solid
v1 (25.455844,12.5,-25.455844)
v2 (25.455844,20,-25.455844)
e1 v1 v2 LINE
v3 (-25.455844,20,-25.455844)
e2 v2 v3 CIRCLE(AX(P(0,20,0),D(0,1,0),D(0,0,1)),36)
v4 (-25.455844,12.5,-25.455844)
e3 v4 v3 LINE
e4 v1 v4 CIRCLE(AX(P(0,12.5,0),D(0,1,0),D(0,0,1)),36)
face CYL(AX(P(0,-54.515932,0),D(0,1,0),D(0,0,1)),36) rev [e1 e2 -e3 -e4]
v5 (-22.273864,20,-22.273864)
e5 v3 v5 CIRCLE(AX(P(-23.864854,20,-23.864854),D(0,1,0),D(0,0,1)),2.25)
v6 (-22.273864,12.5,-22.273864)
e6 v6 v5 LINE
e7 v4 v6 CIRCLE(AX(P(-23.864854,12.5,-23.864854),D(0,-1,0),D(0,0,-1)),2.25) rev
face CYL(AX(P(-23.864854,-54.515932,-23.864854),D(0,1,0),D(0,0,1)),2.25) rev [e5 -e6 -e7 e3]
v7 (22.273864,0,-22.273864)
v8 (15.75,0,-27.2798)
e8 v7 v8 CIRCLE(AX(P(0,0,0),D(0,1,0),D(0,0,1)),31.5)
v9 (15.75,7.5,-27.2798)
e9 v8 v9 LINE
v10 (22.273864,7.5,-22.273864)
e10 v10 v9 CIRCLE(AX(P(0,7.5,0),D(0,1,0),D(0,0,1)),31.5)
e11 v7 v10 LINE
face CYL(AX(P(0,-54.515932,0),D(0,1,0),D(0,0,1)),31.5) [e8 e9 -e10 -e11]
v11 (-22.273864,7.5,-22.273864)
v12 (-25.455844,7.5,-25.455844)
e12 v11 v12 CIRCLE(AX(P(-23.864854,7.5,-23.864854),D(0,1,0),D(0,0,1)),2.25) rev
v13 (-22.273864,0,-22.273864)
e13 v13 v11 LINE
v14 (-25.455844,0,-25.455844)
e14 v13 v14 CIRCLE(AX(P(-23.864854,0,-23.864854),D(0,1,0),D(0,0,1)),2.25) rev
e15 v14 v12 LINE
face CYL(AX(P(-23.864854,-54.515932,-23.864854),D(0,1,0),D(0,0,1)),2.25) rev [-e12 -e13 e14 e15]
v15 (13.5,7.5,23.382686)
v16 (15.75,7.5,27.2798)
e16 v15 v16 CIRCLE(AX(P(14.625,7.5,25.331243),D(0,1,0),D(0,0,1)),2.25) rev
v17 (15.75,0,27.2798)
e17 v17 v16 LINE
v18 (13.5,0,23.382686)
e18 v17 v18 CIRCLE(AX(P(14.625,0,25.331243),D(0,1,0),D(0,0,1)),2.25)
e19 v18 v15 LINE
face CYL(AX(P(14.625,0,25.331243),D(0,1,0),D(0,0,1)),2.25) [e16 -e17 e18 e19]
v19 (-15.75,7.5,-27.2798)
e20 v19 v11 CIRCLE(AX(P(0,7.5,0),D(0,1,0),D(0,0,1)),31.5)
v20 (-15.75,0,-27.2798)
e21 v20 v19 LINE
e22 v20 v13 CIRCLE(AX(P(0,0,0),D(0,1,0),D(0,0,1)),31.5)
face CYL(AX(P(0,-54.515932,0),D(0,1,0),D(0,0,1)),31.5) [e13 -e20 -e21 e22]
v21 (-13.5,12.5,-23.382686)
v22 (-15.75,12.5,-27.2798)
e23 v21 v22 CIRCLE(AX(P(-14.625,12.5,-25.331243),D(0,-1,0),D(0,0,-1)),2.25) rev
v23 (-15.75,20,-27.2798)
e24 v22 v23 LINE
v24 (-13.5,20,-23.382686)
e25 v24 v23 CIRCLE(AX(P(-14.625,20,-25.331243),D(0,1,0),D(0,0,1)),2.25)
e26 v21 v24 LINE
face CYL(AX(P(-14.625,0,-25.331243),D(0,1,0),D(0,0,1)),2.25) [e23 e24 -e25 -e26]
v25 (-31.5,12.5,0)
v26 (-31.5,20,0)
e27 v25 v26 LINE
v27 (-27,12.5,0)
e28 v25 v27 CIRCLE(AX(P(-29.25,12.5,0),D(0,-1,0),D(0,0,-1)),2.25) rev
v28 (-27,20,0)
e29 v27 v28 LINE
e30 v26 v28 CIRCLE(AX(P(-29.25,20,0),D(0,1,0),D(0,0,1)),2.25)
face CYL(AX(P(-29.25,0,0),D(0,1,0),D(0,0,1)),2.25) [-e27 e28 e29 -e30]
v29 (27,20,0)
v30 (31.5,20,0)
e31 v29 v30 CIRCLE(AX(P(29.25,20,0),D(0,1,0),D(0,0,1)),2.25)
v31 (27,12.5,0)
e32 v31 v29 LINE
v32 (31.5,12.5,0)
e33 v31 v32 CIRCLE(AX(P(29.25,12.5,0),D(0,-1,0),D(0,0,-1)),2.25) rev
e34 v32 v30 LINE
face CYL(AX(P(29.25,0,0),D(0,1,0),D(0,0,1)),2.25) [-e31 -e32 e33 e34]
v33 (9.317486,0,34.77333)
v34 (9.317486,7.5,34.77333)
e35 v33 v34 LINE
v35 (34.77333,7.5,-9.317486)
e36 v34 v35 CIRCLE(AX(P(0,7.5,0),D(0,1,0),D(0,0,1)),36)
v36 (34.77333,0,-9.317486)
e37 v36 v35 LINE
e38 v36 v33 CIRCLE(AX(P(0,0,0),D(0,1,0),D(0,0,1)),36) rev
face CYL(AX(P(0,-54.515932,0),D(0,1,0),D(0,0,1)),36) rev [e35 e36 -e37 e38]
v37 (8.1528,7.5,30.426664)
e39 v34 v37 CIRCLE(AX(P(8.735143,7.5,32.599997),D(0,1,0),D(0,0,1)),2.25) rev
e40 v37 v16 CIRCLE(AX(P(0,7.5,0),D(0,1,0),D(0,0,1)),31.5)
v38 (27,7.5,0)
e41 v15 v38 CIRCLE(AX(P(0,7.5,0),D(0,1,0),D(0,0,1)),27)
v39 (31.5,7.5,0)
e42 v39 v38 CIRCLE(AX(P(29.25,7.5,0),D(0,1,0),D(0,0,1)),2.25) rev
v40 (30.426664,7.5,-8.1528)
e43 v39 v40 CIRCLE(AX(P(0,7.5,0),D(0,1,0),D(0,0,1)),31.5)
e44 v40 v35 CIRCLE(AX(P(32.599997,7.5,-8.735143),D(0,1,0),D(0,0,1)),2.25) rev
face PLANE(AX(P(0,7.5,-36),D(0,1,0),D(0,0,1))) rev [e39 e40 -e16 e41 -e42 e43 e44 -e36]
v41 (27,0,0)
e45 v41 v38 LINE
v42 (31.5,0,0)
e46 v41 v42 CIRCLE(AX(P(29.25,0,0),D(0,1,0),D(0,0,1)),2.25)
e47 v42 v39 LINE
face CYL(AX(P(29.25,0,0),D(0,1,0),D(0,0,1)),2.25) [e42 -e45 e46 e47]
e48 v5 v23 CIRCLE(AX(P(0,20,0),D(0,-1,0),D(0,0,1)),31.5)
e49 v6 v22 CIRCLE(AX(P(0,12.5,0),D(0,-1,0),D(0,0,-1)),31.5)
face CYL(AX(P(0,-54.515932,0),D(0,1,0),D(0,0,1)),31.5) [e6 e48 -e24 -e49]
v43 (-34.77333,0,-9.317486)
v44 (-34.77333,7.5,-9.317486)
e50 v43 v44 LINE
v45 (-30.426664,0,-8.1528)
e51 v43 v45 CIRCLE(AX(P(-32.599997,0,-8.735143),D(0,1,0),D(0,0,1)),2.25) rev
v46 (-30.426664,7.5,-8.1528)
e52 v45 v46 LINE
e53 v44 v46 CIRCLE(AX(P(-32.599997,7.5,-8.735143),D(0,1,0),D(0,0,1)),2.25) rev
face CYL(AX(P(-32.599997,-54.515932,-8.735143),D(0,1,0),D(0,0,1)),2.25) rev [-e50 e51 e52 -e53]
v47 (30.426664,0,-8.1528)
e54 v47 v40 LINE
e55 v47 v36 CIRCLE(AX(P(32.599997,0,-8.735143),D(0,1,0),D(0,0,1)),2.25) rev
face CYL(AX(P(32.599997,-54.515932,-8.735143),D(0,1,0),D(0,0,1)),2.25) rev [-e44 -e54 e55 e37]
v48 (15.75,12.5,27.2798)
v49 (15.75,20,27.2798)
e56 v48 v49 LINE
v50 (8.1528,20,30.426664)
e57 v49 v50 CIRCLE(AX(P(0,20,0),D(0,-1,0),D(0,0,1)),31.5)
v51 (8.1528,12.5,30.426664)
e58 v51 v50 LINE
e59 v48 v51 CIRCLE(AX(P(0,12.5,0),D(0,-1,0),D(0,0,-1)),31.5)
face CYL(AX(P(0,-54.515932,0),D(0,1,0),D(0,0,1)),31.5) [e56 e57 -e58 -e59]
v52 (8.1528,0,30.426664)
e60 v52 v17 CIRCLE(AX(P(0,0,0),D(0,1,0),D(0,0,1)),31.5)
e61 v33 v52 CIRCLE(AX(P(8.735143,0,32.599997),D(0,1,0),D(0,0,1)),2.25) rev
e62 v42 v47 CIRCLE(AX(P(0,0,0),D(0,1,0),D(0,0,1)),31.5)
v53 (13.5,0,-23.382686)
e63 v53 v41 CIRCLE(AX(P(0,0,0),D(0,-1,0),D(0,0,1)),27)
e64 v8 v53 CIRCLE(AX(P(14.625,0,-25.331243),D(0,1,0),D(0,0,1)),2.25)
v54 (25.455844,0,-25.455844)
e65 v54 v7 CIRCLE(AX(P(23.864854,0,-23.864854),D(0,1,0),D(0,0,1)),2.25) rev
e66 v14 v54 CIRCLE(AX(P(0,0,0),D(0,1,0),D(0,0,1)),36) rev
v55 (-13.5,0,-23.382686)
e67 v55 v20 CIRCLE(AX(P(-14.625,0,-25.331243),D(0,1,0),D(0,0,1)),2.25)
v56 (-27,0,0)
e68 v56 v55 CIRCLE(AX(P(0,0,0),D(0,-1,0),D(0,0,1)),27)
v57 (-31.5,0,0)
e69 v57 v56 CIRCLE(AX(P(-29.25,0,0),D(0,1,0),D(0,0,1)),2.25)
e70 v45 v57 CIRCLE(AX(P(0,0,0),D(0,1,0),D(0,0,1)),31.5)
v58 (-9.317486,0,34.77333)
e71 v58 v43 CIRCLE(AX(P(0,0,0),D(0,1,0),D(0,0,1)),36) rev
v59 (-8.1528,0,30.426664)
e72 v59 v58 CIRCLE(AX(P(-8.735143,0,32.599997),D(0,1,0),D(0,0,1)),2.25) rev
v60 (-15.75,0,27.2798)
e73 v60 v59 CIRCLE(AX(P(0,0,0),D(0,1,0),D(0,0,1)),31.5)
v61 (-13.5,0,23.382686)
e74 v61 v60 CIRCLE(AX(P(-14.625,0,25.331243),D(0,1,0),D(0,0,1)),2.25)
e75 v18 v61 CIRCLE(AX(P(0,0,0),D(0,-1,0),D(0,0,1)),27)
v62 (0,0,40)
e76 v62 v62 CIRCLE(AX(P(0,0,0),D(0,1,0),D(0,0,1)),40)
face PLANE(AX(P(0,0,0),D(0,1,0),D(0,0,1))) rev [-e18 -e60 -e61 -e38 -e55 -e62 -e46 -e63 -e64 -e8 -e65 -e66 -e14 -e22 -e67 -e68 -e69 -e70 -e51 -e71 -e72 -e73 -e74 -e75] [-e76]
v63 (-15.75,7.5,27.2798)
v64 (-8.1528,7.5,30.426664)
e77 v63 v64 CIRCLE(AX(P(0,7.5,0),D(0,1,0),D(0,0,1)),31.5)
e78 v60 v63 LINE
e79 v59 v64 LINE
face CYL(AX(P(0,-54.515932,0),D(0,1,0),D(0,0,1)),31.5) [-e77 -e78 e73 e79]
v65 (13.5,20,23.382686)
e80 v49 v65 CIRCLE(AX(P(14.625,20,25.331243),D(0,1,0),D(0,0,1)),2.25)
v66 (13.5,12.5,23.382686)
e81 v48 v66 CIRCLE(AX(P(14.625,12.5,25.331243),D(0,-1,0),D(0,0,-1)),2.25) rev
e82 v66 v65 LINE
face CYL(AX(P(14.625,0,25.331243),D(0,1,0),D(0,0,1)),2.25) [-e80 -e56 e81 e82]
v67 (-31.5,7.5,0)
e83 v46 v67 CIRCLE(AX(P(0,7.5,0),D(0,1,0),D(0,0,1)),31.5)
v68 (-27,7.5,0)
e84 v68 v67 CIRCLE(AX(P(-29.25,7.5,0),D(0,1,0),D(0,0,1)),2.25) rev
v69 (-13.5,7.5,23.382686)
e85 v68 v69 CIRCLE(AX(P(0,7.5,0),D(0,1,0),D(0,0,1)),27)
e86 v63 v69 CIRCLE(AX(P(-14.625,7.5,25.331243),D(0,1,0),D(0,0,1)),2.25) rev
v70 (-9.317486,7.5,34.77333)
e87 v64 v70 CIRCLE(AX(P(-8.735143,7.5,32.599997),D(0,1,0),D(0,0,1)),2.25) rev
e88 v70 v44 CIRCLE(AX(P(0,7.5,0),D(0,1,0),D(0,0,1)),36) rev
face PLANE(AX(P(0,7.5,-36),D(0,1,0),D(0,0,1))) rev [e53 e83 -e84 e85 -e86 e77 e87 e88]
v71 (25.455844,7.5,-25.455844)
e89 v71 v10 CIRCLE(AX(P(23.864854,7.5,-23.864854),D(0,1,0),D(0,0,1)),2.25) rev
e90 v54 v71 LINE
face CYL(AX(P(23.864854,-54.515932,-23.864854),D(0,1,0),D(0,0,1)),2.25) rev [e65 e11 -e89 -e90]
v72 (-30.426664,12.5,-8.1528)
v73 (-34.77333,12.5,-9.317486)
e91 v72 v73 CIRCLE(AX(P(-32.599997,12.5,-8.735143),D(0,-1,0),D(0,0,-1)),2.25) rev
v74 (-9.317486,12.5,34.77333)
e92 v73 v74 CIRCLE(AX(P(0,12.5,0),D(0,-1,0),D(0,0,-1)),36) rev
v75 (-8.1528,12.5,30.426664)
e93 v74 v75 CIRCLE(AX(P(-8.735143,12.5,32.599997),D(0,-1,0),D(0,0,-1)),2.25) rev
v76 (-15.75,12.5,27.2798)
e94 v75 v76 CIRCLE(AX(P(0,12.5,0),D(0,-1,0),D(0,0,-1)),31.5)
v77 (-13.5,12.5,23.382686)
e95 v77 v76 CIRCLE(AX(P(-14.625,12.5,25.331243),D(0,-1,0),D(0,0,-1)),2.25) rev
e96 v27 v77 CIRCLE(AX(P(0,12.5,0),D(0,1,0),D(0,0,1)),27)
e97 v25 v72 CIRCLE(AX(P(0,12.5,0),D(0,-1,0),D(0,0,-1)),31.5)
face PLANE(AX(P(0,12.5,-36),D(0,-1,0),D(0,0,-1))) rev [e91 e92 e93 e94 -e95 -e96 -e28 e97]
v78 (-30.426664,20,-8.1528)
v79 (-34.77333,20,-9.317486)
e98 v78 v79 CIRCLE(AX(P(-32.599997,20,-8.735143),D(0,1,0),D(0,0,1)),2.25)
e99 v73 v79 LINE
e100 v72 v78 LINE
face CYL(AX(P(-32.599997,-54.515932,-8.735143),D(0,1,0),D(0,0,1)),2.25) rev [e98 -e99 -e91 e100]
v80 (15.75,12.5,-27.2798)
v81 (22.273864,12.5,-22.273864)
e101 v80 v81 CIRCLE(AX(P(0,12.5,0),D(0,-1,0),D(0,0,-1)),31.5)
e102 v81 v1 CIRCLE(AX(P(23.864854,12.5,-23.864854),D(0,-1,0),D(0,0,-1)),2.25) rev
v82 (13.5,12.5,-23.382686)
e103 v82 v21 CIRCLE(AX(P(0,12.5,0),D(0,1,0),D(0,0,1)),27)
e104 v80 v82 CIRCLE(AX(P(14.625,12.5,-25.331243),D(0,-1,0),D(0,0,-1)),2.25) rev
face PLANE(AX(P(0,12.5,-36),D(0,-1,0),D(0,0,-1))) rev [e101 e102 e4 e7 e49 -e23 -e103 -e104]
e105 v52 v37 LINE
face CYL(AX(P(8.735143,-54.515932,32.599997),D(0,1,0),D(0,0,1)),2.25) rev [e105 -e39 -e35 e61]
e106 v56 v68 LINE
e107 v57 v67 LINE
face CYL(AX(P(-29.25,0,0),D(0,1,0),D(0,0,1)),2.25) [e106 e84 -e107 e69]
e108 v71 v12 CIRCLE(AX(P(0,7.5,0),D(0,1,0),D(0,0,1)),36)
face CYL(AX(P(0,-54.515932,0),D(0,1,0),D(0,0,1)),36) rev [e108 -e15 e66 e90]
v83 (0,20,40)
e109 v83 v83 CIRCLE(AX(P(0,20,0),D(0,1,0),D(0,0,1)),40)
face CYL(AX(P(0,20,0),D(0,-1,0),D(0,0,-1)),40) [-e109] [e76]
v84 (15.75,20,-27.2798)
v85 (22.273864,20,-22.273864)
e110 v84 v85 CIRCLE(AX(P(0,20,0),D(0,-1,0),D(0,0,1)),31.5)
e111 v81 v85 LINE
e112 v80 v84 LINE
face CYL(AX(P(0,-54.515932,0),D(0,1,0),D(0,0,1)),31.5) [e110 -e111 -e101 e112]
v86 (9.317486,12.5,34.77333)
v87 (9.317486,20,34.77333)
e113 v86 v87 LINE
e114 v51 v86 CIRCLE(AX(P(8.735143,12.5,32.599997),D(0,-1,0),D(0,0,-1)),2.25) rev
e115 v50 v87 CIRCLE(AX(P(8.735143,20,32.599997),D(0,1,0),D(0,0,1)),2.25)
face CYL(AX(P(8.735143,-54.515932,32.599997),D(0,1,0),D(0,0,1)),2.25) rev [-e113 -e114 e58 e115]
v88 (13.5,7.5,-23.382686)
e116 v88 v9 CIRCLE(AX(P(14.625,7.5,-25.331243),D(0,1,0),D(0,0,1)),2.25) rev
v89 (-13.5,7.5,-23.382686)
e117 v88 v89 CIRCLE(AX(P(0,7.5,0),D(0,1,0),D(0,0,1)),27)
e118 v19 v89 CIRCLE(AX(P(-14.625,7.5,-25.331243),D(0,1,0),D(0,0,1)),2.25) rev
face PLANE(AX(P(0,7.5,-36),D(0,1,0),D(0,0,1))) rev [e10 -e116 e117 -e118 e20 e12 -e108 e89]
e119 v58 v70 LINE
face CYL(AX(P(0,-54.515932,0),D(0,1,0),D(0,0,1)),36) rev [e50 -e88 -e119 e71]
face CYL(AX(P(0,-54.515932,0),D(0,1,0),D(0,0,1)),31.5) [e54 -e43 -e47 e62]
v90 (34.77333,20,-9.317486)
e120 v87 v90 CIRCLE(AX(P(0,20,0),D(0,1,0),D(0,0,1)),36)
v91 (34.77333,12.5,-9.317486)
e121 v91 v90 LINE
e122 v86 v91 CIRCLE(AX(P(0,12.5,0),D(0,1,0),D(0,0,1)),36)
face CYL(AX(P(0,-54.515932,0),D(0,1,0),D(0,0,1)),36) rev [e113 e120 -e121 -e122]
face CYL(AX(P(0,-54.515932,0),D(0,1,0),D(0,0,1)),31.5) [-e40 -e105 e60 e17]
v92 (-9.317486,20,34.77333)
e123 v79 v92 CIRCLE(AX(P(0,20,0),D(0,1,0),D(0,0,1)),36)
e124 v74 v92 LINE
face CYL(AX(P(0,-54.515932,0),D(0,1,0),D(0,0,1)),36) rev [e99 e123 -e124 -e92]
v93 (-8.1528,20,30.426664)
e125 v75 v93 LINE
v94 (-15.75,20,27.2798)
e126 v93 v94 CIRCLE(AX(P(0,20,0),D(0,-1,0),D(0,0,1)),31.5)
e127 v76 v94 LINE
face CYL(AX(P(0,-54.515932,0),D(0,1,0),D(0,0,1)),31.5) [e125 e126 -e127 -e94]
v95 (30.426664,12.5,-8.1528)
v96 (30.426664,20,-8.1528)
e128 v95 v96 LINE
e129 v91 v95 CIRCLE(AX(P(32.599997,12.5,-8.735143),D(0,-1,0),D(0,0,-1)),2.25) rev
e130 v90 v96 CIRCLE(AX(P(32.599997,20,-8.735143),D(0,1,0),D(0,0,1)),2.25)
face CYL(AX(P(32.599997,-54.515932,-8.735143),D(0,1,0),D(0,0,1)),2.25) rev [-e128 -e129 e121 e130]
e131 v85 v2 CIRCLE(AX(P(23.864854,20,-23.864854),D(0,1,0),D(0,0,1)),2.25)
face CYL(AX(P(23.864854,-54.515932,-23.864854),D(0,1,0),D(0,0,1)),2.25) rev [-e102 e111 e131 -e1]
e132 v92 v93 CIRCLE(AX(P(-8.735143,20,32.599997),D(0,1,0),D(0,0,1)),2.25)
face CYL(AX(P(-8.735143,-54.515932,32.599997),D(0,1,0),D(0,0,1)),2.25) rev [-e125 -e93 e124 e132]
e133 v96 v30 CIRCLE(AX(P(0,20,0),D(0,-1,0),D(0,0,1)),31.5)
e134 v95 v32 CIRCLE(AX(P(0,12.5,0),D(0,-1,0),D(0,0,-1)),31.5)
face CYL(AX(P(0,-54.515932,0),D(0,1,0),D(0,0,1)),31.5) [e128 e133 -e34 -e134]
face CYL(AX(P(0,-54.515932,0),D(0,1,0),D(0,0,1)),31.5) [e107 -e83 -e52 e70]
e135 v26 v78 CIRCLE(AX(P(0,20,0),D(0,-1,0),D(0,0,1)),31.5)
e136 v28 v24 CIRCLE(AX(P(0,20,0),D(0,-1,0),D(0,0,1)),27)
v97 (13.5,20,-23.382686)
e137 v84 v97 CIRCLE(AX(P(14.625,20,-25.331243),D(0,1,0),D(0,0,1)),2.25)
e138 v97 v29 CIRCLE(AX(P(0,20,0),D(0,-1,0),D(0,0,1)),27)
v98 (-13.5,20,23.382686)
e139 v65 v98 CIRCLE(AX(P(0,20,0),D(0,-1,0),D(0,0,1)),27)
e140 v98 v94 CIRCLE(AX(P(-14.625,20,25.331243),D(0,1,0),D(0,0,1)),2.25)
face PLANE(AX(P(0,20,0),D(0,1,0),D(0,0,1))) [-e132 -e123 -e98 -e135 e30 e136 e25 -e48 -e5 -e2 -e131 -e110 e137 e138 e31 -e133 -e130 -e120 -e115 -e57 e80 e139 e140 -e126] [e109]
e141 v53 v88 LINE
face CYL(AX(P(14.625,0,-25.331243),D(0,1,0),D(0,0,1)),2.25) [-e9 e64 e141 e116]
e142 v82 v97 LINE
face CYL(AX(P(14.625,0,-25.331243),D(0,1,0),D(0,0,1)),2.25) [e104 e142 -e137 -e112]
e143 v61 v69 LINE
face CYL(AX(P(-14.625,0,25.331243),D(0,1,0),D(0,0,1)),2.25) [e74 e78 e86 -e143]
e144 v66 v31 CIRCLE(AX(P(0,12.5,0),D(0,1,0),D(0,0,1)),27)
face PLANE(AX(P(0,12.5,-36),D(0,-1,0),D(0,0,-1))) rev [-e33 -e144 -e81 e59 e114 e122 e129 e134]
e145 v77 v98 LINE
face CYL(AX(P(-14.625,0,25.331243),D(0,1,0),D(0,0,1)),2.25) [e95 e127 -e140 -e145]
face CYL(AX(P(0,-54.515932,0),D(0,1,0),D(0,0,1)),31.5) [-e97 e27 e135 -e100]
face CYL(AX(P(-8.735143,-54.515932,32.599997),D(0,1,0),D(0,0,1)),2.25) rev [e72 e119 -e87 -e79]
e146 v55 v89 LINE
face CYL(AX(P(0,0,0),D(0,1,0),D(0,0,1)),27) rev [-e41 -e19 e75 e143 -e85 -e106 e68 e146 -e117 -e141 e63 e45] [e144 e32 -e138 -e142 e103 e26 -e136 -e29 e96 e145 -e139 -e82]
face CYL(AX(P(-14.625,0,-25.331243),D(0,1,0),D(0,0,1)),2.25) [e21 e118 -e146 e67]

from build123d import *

# Parameters (mm, degrees)
ESQUISSE1_R              = 40
ESQUISSE1_R_2            = 25
BOSS_EXTRU_1_DEPTH       = 20
EMPREINTE1_OUTLINE_R     = 25
EMPREINTE1_DEPTH         = 7.5
EMPREINTE1_START         = 12.5
EMPREINTE1_2_OUTLINE_R   = 25
EMPREINTE1_2_DEPTH       = 7.5
EMPREINTE1_START_2       = 7.5
EMPREINTE1_3_OUTLINE_R   = 27
EMPREINTE1_3_OUTLINE_R_2 = 25
EMPREINTE1_3_DEPTH       = 5


# Read off the part's stored shape, not the designer's step: Empreinte1
with BuildPart() as part:
    # Esquisse1 → Boss.-Extru.1 (new body)
    with BuildSketch(Plane(origin=(0, 0, 0), x_dir=(1, 0, 0), z_dir=(0, 1, 0))):
        with Locations(Location((0, 0, 0), (0, 0, 270))):
            Circle(ESQUISSE1_R)
        with Locations(Location((0, 0, 0), (0, 0, 270))):
            Circle(ESQUISSE1_R_2, mode=Mode.SUBTRACT)
    extrude(amount=BOSS_EXTRU_1_DEPTH)

    # Empreinte1 outline → Empreinte1 (cut)
    with BuildSketch(Plane(origin=(0, 0, 0), x_dir=(1, 0, 0), z_dir=(0, 1, 0))):
        with BuildLine():
            ThreePointArc((-15.75, 27.279800219), (-12.676442841, 26.456243061), (-13.5, 23.382685902))
            ThreePointArc((-13.5, 23.382685902), (-23.382685902, 13.5), (-27, 0))
            ThreePointArc((-27, 0), (-29.25, -2.25), (-31.5, 0))
            ThreePointArc((-31.5, 0), (-31.230513133, 4.111575055), (-30.426663528, 8.152799921))
            ThreePointArc((-30.426663528, 8.152799921), (-32.017653786, 10.908475881), (-34.773329746, 9.317485624))
            ThreePointArc((-34.773329746, 9.317485624), (-31.176914536, -18), (-9.317485624, -34.773329746))
            ThreePointArc((-9.317485624, -34.773329746), (-6.561809663, -33.182339489), (-8.152799921, -30.426663528))
            ThreePointArc((-8.152799921, -30.426663528), (-12.05452812, -29.102205274), (-15.75, -27.279800219))
            ThreePointArc((-15.75, -27.279800219), (-16.573557159, -24.20624306), (-13.5, -23.382685902))
            ThreePointArc((-13.5, -23.382685902), (0, -27), (13.5, -23.382685902))
            ThreePointArc((13.5, -23.382685902), (16.573557159, -24.20624306), (15.75, -27.279800219))
            ThreePointArc((15.75, -27.279800219), (12.05452812, -29.102205274), (8.152799921, -30.426663528))
            ThreePointArc((8.152799921, -30.426663528), (6.561809663, -33.182339489), (9.317485624, -34.773329746))
            ThreePointArc((9.317485624, -34.773329746), (31.176914536, -18), (34.773329746, 9.317485624))
            ThreePointArc((34.773329746, 9.317485624), (32.017653786, 10.908475881), (30.426663528, 8.152799921))
            ThreePointArc((30.426663528, 8.152799921), (31.230513133, 4.111575055), (31.5, 0))
            ThreePointArc((31.5, 0), (29.25, -2.25), (27, 0))
            ThreePointArc((27, 0), (23.382685902, 13.5), (13.5, 23.382685902))
            ThreePointArc((13.5, 23.382685902), (12.676442841, 26.456243061), (15.75, 27.279800219))
            ThreePointArc((15.75, 27.279800219), (19.175985014, 24.990630219), (22.273863607, 22.273863607))
            ThreePointArc((22.273863607, 22.273863607), (25.455844123, 22.273863607), (25.455844123, 25.455844123))
            ThreePointArc((25.455844123, 25.455844123), (0, 36), (-25.455844123, 25.455844123))
            ThreePointArc((-25.455844123, 25.455844123), (-25.455844123, 22.273863607), (-22.273863607, 22.273863607))
            ThreePointArc((-22.273863607, 22.273863607), (-19.175985014, 24.990630219), (-15.75, 27.279800219))
        make_face()
        Circle(EMPREINTE1_OUTLINE_R, mode=Mode.SUBTRACT)
    extrude(amount=EMPREINTE1_DEPTH, mode=Mode.SUBTRACT)

    # Empreinte1 2 outline → Empreinte1 2 (cut)
    with BuildSketch(Plane(origin=(0, 0, 0), x_dir=(1, 0, 0), z_dir=(0, 1, 0)).offset(EMPREINTE1_START)):
        with BuildLine():
            ThreePointArc((-15.75, 27.279800219), (-12.676442841, 26.456243061), (-13.5, 23.382685902))
            ThreePointArc((-13.5, 23.382685902), (-23.382685902, 13.5), (-27, 0))
            ThreePointArc((-27, 0), (-29.25, -2.25), (-31.5, 0))
            ThreePointArc((-31.5, 0), (-31.230513133, 4.111575055), (-30.426663528, 8.152799921))
            ThreePointArc((-30.426663528, 8.152799921), (-32.017653786, 10.908475881), (-34.773329746, 9.317485624))
            ThreePointArc((-34.773329746, 9.317485624), (-31.176914536, -18), (-9.317485624, -34.773329746))
            ThreePointArc((-9.317485624, -34.773329746), (-6.561809663, -33.182339489), (-8.152799921, -30.426663528))
            ThreePointArc((-8.152799921, -30.426663528), (-12.05452812, -29.102205274), (-15.75, -27.279800219))
            ThreePointArc((-15.75, -27.279800219), (-16.573557159, -24.20624306), (-13.5, -23.382685902))
            ThreePointArc((-13.5, -23.382685902), (0, -27), (13.5, -23.382685902))
            ThreePointArc((13.5, -23.382685902), (16.573557159, -24.20624306), (15.75, -27.279800219))
            ThreePointArc((15.75, -27.279800219), (12.05452812, -29.102205274), (8.152799921, -30.426663528))
            ThreePointArc((8.152799921, -30.426663528), (6.561809663, -33.182339489), (9.317485624, -34.773329746))
            ThreePointArc((9.317485624, -34.773329746), (31.176914536, -18), (34.773329746, 9.317485624))
            ThreePointArc((34.773329746, 9.317485624), (32.017653786, 10.908475881), (30.426663528, 8.152799921))
            ThreePointArc((30.426663528, 8.152799921), (31.230513133, 4.111575055), (31.5, 0))
            ThreePointArc((31.5, 0), (29.25, -2.25), (27, 0))
            ThreePointArc((27, 0), (23.382685902, 13.5), (13.5, 23.382685902))
            ThreePointArc((13.5, 23.382685902), (12.676442841, 26.456243061), (15.75, 27.279800219))
            ThreePointArc((15.75, 27.279800219), (19.175985014, 24.990630219), (22.273863607, 22.273863607))
            ThreePointArc((22.273863607, 22.273863607), (25.455844123, 22.273863607), (25.455844123, 25.455844123))
            ThreePointArc((25.455844123, 25.455844123), (0, 36), (-25.455844123, 25.455844123))
            ThreePointArc((-25.455844123, 25.455844123), (-25.455844123, 22.273863607), (-22.273863607, 22.273863607))
            ThreePointArc((-22.273863607, 22.273863607), (-19.175985014, 24.990630219), (-15.75, 27.279800219))
        make_face()
        Circle(EMPREINTE1_2_OUTLINE_R, mode=Mode.SUBTRACT)
    extrude(amount=EMPREINTE1_2_DEPTH, mode=Mode.SUBTRACT)

    # Empreinte1 3 outline → Empreinte1 3 (cut)
    with BuildSketch(Plane(origin=(0, 0, 0), x_dir=(1, 0, 0), z_dir=(0, 1, 0)).offset(EMPREINTE1_START_2)):
        Circle(EMPREINTE1_3_OUTLINE_R)
        Circle(EMPREINTE1_3_OUTLINE_R_2, mode=Mode.SUBTRACT)
    extrude(amount=EMPREINTE1_3_DEPTH, mode=Mode.SUBTRACT)


solid = part.part
